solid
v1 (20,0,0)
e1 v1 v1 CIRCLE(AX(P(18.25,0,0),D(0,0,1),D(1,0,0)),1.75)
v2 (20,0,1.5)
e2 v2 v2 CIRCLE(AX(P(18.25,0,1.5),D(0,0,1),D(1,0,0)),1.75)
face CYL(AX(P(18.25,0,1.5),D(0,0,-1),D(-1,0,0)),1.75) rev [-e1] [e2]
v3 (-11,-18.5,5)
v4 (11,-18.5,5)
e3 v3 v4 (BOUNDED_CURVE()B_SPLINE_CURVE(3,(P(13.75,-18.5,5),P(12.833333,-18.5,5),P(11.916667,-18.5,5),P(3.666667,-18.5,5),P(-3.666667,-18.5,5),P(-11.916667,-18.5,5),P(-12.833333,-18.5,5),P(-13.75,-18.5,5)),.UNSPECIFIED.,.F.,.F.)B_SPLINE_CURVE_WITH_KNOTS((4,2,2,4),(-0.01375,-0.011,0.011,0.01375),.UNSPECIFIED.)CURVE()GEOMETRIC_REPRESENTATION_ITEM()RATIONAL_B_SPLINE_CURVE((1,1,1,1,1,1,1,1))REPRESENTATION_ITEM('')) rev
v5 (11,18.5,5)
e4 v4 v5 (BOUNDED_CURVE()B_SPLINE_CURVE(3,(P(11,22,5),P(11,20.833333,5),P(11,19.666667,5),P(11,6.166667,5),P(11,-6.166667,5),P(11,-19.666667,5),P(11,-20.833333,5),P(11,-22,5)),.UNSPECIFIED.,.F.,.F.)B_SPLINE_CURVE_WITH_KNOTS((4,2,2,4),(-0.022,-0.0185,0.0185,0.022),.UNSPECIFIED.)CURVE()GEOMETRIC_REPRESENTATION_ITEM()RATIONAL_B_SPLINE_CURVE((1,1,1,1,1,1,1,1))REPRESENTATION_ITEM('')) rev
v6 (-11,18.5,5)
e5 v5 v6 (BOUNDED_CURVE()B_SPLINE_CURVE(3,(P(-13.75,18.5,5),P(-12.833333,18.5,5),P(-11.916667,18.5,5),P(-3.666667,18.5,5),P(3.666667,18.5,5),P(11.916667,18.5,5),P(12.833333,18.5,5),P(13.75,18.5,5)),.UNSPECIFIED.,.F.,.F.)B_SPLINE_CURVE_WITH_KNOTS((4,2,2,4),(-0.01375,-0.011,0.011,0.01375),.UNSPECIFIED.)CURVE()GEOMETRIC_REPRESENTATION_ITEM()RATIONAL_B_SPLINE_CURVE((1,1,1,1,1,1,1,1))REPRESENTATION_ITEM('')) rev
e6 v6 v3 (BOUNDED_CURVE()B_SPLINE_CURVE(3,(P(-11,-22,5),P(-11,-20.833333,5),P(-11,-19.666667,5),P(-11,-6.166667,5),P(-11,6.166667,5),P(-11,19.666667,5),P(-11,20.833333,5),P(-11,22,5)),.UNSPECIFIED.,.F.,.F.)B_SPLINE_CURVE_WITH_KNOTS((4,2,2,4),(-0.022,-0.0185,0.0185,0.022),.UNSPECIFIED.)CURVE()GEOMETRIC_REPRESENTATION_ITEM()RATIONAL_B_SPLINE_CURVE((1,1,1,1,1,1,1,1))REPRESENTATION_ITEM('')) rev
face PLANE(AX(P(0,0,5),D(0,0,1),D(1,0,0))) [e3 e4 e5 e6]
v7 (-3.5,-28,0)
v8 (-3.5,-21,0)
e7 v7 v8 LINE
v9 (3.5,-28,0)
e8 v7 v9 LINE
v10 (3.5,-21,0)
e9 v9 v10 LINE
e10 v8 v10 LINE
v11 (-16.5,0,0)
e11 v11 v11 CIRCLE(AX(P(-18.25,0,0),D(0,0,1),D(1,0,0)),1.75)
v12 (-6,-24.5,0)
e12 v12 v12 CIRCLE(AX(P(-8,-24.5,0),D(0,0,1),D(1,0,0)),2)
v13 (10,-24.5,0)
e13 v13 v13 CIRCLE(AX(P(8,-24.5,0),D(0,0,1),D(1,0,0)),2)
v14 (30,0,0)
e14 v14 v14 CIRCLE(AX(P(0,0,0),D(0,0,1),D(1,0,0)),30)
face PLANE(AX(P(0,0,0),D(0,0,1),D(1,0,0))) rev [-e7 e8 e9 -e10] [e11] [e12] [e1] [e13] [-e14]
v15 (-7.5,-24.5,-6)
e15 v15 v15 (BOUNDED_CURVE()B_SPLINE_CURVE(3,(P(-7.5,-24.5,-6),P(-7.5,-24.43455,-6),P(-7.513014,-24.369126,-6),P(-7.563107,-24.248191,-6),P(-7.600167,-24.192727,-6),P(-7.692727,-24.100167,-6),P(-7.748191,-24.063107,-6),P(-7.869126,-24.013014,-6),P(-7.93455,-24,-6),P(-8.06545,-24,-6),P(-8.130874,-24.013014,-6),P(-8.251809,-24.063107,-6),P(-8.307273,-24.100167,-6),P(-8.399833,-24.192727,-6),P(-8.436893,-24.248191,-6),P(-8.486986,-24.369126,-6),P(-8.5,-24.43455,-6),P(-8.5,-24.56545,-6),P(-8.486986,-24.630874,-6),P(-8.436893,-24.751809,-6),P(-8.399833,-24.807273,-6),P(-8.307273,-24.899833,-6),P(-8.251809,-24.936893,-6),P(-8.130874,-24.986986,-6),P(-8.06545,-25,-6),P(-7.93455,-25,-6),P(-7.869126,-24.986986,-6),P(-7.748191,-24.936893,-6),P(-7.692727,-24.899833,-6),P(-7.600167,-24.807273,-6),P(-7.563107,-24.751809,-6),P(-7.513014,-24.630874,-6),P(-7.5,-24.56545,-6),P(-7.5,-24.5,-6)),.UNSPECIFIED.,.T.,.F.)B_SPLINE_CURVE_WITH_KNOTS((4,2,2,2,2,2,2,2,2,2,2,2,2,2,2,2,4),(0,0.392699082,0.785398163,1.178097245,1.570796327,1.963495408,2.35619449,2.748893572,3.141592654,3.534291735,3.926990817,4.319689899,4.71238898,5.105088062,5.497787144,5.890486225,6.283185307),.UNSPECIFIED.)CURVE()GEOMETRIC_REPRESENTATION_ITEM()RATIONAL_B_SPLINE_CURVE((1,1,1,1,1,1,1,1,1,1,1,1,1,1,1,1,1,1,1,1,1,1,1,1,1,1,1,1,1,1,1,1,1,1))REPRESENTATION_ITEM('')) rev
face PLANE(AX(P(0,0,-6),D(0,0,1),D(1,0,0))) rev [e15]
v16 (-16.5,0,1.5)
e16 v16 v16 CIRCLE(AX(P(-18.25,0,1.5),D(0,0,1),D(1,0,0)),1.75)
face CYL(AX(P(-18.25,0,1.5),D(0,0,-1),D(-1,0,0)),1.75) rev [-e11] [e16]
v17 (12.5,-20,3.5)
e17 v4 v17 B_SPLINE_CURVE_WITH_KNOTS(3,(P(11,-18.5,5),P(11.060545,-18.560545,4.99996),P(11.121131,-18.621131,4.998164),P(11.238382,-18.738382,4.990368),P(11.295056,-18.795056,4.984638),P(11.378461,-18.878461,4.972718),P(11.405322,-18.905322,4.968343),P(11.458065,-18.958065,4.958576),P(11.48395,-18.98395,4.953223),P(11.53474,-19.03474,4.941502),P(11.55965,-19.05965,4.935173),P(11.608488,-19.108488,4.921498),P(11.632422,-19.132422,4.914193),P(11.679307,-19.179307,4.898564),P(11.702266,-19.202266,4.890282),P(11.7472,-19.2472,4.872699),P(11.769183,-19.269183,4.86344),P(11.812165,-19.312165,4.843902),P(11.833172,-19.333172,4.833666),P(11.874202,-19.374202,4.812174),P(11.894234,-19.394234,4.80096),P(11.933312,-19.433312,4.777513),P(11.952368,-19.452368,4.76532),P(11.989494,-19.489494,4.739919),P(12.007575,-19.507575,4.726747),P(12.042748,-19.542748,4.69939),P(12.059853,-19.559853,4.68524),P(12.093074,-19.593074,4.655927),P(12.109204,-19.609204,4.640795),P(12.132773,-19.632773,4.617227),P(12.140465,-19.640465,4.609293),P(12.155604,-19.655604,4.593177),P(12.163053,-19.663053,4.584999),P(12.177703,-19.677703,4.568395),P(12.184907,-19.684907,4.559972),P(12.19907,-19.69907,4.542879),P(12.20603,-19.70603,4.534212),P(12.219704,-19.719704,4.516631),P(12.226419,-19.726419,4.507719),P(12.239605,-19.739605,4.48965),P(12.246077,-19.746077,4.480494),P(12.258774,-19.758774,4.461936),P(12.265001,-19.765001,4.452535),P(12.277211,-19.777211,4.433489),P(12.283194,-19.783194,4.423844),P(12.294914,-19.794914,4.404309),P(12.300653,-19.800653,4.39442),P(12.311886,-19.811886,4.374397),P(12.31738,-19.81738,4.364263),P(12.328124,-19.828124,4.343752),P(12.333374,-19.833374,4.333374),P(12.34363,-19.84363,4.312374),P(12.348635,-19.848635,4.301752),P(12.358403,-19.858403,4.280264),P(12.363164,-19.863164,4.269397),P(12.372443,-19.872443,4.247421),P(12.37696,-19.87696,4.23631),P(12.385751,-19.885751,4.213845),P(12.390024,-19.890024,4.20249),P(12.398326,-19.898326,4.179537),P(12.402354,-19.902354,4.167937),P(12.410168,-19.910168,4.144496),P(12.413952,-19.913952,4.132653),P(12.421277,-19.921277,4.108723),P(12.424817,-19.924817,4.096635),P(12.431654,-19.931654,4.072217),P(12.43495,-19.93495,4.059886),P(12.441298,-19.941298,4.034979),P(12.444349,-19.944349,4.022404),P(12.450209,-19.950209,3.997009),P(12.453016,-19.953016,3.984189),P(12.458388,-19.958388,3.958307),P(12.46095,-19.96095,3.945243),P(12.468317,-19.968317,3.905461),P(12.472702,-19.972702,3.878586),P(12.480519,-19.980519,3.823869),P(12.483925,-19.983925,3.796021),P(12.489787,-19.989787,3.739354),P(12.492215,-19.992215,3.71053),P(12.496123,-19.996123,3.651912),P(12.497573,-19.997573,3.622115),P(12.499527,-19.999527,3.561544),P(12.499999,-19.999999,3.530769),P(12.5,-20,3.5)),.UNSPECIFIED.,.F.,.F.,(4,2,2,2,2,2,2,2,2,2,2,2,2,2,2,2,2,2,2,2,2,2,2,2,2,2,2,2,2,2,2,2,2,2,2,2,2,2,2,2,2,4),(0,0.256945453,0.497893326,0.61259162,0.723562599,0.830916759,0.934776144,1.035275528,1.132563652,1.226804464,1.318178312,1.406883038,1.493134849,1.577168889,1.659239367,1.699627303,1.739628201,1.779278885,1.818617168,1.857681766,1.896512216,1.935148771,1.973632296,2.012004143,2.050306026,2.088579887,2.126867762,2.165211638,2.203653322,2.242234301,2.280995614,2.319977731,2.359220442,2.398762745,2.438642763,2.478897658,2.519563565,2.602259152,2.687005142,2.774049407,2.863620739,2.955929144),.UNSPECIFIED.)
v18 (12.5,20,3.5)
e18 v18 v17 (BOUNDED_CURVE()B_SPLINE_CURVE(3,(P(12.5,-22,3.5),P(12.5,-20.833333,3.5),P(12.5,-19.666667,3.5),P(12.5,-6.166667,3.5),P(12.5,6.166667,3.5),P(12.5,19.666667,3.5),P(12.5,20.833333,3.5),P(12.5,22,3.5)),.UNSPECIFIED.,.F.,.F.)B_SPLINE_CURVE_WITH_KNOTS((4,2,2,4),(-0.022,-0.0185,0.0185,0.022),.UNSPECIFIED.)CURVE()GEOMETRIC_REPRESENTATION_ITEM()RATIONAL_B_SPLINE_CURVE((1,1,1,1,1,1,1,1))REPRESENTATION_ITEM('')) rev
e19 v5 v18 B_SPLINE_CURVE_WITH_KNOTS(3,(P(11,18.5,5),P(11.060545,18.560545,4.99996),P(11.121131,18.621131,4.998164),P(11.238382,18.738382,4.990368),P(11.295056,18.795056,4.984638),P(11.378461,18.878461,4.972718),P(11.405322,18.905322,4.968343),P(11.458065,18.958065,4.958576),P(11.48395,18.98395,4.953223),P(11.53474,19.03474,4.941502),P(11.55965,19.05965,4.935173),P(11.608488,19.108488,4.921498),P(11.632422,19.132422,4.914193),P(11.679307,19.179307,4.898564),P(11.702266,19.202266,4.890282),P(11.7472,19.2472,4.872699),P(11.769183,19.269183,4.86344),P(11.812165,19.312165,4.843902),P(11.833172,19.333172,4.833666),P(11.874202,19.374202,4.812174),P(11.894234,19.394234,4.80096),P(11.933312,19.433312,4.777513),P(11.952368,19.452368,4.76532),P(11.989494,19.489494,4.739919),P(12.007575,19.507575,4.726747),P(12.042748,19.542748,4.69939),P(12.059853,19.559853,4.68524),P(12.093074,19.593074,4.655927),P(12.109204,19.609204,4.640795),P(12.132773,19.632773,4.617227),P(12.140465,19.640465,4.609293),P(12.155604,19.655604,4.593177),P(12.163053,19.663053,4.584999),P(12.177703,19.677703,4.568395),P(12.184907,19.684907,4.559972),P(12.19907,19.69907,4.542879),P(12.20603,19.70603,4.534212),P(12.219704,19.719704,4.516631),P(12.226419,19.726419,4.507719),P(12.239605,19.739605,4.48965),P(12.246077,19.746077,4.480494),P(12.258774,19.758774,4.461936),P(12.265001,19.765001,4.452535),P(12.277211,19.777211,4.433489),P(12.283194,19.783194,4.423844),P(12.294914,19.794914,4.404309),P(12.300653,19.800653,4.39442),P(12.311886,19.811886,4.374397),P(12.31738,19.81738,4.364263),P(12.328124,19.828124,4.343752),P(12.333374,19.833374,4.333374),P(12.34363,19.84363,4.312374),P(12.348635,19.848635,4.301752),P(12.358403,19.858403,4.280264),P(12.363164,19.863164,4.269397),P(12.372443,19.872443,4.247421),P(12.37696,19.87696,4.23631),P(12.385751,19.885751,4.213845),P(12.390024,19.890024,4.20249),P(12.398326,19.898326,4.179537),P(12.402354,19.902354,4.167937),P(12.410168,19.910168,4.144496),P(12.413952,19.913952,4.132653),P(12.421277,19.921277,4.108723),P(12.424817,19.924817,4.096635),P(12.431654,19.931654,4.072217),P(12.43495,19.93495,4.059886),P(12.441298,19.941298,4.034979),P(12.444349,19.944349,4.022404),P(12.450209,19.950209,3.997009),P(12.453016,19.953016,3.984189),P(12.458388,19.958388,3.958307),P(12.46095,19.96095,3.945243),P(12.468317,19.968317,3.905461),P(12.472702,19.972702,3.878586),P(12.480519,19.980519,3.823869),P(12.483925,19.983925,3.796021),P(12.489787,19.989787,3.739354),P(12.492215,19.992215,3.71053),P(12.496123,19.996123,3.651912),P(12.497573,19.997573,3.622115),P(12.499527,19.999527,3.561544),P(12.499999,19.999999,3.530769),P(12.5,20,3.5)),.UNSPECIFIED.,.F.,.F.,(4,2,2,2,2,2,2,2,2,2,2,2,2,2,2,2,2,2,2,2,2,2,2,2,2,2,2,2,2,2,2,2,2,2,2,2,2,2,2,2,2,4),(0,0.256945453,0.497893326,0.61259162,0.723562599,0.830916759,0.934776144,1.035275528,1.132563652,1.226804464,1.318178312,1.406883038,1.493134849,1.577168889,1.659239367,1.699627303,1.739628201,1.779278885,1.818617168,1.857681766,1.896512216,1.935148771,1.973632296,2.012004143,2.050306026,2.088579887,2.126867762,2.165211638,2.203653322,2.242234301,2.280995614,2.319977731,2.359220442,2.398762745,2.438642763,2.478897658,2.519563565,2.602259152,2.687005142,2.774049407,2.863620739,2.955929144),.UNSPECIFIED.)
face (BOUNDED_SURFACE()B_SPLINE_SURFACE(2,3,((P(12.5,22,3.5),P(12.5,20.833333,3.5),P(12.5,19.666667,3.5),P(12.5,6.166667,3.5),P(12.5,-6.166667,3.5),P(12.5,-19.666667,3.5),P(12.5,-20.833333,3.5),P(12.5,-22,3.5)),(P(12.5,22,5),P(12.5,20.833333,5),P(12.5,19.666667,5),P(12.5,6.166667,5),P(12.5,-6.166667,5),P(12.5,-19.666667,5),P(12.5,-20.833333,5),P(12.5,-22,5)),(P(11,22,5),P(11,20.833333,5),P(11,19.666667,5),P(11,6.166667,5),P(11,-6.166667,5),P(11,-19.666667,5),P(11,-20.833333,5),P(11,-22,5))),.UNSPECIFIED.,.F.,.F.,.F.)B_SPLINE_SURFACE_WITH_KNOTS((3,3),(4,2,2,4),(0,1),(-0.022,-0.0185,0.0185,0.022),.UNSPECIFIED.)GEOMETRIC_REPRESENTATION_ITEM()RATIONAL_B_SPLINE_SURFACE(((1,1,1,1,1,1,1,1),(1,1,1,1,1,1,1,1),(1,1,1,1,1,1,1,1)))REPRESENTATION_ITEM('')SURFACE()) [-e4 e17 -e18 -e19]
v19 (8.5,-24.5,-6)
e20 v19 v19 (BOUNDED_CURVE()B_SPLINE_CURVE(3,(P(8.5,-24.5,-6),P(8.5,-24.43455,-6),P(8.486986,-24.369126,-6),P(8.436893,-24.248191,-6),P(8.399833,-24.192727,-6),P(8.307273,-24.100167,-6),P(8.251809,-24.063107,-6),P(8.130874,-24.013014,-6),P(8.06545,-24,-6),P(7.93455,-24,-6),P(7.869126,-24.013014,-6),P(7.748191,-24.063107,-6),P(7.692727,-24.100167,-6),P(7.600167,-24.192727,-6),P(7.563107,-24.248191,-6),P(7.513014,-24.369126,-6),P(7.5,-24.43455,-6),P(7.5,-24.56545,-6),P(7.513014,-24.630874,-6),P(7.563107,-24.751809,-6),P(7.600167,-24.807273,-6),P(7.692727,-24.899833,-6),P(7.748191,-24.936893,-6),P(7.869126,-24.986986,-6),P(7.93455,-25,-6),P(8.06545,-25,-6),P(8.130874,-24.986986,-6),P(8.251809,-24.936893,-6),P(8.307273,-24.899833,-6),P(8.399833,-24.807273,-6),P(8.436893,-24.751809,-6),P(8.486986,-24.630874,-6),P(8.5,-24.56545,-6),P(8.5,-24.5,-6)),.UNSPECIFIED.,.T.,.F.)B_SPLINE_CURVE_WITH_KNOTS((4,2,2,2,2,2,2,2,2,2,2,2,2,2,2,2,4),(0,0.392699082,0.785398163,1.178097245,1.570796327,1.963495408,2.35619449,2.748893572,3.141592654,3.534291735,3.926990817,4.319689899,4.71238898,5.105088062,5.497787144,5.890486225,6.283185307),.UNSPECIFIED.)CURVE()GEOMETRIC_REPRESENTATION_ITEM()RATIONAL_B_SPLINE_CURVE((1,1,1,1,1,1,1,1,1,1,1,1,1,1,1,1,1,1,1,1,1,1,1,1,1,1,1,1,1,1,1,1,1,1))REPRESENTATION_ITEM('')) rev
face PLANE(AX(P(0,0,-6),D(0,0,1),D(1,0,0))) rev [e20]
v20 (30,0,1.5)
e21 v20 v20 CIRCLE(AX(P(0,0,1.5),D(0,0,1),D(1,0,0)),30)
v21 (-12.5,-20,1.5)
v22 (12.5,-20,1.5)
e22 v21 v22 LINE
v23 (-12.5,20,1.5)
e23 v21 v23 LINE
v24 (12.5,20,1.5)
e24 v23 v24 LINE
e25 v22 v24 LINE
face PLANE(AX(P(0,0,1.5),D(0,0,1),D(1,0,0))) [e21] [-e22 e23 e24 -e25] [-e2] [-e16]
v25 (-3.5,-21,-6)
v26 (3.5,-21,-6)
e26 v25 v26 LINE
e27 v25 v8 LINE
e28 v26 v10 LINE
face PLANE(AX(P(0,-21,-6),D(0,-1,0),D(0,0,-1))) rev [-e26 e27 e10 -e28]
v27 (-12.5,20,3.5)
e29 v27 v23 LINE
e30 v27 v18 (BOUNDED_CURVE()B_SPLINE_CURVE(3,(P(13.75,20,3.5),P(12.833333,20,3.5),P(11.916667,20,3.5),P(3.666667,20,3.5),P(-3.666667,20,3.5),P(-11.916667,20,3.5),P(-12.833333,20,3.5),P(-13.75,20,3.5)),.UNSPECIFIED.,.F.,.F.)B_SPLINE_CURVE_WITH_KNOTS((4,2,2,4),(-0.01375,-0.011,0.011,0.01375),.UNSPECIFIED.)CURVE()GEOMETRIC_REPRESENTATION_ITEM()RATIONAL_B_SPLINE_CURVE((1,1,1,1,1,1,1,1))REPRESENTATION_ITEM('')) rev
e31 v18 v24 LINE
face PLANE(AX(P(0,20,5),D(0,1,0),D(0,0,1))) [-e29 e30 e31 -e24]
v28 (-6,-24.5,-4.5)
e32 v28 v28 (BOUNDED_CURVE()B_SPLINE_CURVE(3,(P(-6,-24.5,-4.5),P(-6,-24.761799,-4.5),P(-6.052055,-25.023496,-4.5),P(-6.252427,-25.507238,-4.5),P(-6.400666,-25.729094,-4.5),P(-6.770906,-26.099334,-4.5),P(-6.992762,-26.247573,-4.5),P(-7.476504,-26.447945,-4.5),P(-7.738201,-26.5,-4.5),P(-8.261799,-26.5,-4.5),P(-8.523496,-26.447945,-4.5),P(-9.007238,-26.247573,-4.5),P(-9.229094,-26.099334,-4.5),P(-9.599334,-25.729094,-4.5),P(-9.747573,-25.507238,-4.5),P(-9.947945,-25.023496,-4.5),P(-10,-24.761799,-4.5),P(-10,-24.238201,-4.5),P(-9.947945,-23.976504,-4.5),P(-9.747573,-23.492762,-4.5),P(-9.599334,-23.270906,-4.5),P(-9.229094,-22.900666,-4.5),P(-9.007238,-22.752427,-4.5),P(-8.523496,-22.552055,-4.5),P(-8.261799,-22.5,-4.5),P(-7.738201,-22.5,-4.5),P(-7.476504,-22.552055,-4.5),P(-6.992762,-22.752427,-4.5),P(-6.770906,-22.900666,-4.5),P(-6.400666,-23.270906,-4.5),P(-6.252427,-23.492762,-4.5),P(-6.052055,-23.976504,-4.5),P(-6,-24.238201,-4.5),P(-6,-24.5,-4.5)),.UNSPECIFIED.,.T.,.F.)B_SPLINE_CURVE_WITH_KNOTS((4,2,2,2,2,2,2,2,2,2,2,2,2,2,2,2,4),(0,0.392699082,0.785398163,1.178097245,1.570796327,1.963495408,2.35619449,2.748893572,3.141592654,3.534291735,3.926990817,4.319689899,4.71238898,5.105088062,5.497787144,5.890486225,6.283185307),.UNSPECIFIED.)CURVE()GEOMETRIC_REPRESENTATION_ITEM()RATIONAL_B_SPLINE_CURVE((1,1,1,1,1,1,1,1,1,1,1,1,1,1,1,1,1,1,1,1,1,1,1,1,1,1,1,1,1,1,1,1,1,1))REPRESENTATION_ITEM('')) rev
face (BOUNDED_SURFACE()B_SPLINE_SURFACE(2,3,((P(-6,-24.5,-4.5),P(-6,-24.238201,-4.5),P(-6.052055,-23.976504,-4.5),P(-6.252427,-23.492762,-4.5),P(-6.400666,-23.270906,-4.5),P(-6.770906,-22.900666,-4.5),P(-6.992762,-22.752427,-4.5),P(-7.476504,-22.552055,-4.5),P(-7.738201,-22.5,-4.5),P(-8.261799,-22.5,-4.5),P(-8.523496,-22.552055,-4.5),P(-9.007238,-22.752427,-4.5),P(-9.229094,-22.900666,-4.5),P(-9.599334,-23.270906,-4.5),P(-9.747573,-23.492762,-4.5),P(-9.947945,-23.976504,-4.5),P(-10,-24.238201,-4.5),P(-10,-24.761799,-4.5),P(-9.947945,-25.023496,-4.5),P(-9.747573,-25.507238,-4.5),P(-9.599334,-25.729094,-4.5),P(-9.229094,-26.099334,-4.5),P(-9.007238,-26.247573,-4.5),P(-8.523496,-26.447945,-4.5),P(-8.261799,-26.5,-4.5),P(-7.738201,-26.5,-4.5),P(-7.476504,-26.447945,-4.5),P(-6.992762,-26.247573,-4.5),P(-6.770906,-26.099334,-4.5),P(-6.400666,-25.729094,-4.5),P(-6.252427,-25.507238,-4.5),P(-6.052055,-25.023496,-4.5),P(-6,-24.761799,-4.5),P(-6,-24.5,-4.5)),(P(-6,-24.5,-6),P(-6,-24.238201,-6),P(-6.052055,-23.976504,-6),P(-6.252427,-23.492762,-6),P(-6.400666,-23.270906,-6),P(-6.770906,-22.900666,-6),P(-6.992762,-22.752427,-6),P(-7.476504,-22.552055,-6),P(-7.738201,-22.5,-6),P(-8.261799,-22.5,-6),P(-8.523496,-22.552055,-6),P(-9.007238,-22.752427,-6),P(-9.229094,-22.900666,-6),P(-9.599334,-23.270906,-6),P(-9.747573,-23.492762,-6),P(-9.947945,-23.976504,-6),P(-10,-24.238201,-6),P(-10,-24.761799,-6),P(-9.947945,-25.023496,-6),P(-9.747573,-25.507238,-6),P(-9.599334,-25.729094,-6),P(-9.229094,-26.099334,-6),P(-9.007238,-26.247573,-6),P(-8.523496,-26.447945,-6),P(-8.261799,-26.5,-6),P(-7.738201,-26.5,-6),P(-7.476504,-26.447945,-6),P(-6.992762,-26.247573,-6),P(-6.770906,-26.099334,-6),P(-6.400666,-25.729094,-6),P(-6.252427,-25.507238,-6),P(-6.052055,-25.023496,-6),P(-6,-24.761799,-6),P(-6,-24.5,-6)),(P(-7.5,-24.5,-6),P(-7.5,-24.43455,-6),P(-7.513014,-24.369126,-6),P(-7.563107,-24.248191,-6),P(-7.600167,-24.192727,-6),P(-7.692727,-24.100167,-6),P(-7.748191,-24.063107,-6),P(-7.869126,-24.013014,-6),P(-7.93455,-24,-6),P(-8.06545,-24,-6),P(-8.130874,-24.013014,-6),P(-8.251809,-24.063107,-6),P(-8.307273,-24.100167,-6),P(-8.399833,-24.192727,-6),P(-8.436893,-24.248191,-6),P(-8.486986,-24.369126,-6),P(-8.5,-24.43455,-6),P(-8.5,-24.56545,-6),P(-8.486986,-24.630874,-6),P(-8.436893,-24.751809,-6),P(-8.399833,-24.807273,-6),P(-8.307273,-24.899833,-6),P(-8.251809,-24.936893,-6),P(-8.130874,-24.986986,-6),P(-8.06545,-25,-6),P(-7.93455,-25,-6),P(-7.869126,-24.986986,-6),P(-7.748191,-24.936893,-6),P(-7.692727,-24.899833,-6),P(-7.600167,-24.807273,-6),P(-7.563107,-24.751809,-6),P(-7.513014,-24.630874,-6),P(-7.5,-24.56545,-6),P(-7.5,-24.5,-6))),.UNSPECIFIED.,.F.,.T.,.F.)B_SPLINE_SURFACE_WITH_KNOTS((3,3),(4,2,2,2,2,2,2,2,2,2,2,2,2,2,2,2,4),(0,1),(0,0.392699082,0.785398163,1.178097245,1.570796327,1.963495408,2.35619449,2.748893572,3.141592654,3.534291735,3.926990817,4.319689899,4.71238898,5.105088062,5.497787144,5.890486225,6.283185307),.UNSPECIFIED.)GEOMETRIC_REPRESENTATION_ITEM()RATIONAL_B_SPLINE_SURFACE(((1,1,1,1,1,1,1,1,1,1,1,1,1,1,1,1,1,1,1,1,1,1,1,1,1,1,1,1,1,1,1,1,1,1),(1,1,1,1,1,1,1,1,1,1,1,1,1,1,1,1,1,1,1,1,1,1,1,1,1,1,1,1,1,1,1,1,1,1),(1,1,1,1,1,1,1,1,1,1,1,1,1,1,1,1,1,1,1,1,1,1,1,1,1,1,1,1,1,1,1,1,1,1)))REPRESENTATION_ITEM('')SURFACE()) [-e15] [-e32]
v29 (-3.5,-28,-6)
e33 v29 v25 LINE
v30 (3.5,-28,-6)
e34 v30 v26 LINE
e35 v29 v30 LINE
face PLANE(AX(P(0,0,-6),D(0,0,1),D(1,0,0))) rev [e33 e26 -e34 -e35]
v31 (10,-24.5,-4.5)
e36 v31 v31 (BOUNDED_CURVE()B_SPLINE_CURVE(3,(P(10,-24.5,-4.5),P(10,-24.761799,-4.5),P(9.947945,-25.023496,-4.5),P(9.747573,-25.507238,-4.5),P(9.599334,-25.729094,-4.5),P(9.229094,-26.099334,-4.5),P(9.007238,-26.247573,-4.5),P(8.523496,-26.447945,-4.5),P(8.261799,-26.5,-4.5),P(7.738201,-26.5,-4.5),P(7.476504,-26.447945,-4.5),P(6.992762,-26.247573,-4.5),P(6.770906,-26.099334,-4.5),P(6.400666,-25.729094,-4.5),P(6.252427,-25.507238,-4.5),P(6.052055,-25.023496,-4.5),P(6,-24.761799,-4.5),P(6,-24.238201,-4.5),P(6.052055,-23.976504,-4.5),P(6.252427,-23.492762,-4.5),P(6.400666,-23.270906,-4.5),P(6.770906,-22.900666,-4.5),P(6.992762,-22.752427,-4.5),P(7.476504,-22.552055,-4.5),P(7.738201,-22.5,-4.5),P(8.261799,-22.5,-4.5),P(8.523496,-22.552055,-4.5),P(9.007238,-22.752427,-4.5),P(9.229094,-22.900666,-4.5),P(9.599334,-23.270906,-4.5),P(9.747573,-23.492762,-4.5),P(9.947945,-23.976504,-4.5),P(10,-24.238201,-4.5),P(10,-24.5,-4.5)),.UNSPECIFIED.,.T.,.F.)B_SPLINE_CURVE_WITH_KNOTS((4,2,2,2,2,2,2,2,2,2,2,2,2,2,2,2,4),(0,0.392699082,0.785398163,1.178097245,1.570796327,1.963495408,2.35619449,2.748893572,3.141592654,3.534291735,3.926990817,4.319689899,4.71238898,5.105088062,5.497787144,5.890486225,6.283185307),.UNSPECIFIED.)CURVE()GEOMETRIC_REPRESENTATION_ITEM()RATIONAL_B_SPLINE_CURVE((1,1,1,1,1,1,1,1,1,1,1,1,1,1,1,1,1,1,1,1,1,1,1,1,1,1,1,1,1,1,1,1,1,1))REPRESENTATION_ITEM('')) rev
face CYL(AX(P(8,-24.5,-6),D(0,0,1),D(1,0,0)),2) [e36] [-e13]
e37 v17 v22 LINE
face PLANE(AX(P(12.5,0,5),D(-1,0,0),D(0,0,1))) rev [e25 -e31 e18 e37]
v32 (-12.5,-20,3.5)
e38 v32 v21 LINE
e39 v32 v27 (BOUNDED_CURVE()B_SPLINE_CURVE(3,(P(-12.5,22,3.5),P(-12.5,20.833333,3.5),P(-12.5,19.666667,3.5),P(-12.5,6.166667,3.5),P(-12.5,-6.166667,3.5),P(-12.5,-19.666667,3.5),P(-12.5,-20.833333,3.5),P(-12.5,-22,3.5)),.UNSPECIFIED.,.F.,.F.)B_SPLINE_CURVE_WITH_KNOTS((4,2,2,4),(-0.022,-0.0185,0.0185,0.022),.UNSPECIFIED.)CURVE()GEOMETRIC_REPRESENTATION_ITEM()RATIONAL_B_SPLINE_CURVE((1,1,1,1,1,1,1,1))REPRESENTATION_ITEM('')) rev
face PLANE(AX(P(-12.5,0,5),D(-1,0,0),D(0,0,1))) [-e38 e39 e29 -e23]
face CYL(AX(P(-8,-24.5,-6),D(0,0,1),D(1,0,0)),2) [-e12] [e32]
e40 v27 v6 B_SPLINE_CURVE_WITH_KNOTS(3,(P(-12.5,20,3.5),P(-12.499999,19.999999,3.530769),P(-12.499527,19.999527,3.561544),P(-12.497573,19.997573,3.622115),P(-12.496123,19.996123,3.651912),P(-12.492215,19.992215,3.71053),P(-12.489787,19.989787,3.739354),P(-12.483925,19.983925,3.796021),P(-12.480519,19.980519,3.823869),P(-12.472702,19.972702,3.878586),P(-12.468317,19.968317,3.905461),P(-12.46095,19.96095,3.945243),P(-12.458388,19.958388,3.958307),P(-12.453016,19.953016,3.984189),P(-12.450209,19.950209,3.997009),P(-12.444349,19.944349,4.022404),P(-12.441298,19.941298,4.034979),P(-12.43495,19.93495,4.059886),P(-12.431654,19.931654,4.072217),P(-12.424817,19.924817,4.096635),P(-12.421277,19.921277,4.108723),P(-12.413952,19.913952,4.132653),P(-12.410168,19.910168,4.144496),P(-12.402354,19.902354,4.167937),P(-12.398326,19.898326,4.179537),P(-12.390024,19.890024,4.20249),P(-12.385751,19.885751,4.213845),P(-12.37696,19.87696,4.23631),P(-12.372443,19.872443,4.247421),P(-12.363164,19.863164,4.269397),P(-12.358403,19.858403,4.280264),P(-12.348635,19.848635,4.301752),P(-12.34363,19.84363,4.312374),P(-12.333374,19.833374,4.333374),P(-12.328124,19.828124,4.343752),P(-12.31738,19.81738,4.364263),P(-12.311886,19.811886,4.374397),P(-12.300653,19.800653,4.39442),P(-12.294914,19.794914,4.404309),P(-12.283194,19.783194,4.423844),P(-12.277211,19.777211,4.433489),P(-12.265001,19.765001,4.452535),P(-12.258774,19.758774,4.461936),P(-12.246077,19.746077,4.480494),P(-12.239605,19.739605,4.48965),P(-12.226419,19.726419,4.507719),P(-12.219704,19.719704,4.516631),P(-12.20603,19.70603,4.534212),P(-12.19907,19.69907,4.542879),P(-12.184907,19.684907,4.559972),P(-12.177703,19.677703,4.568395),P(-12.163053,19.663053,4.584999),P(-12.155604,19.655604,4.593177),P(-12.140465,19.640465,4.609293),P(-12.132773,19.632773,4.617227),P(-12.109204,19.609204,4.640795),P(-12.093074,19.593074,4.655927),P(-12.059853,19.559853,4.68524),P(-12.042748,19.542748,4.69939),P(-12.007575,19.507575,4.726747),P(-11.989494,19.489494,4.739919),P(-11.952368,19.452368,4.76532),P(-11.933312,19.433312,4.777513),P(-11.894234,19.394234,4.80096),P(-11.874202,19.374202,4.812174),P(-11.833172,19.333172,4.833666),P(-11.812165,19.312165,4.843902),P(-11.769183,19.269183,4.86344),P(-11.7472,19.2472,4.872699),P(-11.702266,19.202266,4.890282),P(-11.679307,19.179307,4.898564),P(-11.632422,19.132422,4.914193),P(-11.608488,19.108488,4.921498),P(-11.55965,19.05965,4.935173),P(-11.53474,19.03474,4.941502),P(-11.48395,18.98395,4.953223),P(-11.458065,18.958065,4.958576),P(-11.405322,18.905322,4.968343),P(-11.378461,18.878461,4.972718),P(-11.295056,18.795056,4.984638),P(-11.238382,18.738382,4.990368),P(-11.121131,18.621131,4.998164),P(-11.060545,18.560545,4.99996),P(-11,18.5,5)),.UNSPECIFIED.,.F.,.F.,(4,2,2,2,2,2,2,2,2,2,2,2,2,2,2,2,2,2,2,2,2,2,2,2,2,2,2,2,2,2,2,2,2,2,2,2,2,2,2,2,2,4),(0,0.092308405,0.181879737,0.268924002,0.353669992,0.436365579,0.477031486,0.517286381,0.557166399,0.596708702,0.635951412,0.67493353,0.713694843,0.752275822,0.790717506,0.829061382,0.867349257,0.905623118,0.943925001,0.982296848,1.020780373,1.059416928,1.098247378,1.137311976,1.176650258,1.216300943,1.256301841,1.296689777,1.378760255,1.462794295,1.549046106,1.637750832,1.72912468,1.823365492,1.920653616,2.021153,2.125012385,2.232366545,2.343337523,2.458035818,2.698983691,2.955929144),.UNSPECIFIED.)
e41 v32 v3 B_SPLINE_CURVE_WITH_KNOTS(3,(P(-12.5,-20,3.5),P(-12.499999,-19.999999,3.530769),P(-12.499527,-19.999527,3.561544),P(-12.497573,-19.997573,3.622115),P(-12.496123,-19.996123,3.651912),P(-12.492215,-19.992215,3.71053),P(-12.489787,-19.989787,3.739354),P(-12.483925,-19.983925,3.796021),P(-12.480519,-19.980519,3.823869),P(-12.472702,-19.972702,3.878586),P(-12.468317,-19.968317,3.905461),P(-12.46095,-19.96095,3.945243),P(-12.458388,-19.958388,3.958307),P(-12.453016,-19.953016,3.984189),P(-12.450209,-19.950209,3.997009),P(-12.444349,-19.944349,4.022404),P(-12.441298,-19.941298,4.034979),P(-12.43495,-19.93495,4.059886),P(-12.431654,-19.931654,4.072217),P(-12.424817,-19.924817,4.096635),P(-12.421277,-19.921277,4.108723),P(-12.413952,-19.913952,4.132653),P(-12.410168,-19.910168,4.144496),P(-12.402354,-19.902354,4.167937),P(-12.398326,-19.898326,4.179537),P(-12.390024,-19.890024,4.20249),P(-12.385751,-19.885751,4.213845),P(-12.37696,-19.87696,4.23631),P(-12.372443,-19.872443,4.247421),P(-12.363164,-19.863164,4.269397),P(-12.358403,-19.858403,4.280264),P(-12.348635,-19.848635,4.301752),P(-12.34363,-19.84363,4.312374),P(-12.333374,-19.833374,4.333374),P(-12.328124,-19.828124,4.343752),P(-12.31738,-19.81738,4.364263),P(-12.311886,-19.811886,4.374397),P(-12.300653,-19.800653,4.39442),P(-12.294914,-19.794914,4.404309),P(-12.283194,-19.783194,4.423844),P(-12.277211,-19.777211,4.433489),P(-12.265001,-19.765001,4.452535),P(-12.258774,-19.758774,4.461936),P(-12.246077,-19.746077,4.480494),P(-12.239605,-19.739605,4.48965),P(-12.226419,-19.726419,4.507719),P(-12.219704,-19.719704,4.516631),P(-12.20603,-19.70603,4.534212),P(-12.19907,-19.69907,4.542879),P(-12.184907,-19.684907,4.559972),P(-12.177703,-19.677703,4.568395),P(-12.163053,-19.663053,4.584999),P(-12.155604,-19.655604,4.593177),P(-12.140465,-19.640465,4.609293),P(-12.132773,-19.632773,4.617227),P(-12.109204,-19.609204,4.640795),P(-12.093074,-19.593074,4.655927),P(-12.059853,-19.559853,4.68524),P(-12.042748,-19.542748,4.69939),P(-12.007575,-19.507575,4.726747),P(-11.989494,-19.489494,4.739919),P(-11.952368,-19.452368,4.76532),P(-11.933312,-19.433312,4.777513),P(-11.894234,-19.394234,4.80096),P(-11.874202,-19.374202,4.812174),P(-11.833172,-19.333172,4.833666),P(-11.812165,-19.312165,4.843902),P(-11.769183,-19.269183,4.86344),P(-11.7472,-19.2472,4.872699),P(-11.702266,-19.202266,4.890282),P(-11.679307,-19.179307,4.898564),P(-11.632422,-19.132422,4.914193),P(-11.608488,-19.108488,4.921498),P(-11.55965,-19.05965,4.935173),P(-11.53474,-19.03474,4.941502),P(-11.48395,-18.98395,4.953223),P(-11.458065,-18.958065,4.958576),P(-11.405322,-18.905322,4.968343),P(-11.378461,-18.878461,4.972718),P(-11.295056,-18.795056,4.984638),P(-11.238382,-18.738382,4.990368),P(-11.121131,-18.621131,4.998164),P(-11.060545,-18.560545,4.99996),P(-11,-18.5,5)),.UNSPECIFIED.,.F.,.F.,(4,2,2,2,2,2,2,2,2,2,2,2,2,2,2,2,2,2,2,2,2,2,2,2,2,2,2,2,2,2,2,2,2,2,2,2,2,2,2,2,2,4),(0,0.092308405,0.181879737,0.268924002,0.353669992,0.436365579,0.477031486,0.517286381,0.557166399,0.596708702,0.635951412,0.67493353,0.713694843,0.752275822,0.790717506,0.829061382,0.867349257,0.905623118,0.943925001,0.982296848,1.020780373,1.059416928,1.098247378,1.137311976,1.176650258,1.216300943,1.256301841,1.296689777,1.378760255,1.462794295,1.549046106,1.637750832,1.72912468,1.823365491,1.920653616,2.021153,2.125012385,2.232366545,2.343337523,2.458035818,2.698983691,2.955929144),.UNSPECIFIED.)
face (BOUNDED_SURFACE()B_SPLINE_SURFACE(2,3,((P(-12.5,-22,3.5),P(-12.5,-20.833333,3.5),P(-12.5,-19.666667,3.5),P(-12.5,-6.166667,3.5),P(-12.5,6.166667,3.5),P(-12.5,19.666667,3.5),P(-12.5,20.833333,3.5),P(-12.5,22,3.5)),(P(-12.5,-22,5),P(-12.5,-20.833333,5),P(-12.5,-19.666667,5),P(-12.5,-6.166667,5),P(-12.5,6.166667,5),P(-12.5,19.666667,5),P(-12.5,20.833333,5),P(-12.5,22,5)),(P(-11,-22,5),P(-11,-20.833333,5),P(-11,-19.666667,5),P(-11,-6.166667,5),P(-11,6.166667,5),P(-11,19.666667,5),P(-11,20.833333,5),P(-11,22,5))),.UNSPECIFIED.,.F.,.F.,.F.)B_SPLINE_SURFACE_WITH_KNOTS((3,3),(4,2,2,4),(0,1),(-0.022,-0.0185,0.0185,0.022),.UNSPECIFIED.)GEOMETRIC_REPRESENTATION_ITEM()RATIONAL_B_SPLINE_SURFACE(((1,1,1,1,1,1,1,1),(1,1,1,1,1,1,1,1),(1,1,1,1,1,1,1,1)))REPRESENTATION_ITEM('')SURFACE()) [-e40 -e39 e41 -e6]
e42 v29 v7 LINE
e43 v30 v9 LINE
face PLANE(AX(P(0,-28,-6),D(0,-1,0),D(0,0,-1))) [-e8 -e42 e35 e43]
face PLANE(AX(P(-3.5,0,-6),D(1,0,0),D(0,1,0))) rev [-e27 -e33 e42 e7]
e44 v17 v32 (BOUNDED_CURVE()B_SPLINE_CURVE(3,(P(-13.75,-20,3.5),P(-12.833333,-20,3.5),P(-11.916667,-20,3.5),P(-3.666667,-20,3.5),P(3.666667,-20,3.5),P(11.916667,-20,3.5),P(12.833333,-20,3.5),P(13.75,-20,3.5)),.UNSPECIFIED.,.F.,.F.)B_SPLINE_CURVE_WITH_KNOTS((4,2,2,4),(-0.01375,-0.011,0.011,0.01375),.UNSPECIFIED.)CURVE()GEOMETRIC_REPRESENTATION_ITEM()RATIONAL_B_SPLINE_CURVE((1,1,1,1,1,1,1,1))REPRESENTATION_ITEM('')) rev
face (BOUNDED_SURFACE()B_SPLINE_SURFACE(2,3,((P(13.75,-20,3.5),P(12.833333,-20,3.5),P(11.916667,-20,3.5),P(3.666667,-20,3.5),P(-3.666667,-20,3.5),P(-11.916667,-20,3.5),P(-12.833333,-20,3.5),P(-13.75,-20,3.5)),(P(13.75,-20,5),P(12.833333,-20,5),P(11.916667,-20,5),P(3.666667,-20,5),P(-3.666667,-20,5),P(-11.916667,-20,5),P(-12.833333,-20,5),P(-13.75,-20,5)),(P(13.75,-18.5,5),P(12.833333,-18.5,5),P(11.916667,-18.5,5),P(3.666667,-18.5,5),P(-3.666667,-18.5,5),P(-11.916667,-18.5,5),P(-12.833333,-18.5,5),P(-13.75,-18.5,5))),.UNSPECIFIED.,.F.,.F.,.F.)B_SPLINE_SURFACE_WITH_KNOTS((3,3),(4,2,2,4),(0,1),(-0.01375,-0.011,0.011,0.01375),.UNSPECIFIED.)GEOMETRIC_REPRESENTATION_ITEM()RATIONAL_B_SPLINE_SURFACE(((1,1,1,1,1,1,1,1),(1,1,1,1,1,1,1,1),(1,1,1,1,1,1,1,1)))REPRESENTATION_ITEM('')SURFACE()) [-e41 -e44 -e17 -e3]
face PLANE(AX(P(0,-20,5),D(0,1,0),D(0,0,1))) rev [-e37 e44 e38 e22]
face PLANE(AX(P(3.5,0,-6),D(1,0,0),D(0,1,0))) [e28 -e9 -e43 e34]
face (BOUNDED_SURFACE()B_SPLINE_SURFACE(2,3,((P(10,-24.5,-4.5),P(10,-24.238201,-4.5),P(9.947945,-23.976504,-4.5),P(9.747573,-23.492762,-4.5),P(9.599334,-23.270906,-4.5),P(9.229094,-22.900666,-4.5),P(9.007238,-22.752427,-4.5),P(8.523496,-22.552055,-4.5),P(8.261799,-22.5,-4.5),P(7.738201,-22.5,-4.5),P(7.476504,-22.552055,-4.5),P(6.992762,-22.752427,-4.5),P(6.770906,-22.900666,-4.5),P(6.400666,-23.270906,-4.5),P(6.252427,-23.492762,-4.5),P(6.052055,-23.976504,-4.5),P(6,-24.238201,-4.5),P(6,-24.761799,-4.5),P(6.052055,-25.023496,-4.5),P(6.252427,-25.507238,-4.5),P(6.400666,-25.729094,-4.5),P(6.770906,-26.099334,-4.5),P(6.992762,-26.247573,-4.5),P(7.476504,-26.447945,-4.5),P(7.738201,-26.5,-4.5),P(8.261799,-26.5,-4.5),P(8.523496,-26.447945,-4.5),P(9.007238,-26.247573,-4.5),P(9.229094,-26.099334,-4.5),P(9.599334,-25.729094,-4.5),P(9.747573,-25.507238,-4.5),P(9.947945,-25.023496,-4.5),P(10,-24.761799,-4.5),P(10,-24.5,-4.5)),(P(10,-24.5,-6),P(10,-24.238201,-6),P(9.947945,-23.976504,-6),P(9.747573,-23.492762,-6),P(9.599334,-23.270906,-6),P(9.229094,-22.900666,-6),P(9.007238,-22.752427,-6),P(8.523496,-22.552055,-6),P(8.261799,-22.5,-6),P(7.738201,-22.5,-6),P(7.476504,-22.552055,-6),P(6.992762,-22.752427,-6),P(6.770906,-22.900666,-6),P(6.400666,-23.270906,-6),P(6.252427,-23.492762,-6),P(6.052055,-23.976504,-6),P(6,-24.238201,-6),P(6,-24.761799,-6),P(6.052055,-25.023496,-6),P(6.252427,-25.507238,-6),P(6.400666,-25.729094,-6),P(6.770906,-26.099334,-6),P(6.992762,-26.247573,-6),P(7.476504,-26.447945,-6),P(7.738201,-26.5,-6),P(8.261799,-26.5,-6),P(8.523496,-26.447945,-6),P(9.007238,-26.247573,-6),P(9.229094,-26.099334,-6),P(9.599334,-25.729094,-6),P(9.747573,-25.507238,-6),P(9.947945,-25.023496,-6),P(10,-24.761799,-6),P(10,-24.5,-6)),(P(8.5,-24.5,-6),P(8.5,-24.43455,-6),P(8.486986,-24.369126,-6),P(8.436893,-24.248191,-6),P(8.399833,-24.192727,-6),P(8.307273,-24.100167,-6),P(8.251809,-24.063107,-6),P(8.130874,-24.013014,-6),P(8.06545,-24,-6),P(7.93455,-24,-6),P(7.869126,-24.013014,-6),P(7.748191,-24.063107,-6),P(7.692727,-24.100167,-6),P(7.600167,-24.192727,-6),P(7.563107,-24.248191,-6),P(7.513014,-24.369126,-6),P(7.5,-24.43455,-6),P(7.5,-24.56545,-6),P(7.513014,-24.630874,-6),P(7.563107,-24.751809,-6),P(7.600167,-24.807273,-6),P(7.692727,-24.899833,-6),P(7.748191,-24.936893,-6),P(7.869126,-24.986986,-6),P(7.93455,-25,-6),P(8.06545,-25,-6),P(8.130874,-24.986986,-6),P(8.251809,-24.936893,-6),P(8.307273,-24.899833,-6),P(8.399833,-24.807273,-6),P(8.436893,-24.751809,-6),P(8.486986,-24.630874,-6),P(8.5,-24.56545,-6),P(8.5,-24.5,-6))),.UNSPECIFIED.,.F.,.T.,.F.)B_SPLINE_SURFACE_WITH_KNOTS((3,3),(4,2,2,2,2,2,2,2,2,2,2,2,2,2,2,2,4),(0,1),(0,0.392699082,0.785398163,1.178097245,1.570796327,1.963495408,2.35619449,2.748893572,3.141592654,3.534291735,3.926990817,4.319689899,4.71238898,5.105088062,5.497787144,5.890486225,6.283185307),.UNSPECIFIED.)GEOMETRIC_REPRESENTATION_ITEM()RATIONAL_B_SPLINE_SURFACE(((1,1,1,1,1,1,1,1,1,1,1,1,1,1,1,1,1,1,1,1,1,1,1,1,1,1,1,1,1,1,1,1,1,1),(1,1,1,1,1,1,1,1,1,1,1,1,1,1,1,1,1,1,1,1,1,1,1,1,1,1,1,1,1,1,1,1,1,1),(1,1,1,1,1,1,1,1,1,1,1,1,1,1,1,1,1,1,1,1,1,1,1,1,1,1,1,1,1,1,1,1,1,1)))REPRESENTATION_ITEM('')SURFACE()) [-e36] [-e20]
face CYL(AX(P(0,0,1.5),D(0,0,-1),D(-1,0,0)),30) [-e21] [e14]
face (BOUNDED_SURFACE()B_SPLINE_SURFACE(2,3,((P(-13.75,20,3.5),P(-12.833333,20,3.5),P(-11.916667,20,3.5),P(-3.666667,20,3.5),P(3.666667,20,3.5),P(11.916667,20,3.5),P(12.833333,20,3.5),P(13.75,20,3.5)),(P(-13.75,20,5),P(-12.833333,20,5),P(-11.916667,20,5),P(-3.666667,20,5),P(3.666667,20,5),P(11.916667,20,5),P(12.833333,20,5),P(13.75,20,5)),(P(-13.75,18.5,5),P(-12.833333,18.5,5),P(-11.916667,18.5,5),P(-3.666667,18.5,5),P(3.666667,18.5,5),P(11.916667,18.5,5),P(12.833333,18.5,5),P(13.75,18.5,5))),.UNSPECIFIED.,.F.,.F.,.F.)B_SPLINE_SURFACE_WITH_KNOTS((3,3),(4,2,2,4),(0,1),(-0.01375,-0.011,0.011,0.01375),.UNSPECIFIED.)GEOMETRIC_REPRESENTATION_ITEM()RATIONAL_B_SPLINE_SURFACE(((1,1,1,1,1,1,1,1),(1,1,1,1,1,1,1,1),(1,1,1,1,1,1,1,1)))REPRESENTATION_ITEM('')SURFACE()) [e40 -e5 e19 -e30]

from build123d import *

# Parameters (mm, degrees)
SKETCH_1_R      = 30
SKETCH_1_R_2    = 1.75
SKETCH_1_W      = 25
SKETCH_1_H      = 40
EXTRUDE_6_DEPTH = 1.5
EXTRUDE_7_DEPTH = 5
SKETCH_1_10_R   = 2
SKETCH_1_10_W   = 7
SKETCH_1_10_H   = 7
EXTRUDE_8_DEPTH = 6
FILLET_3_SIZE   = 1.5
FILLET_4_SIZE   = 1.5
EXTRUDE_9_DEPTH = 5
FILLET_5_SIZE   = 1.5


with BuildPart() as part:
    # 草图1 → 凸台-拉伸6 (new body)
    with BuildSketch(Plane.XY):
        Circle(SKETCH_1_R)
        with Locations((18.25, 0)):
            Circle(SKETCH_1_R_2, mode=Mode.SUBTRACT)
        with Locations((-18.25, 0)):
            Circle(SKETCH_1_R_2, mode=Mode.SUBTRACT)
        Rectangle(SKETCH_1_W, SKETCH_1_H, mode=Mode.SUBTRACT)
    extrude(amount=EXTRUDE_6_DEPTH)

    # 草图1<9> → 凸台-拉伸7 (add)
    with BuildSketch(Plane.XY):
        Polygon((-12.5, 20), (-12.5, 0), (0, 0), (12.5, 0), (12.5, 20), align=None)
    extrude(amount=EXTRUDE_7_DEPTH)

    # 草图1<10> → 凸台-拉伸8 (add)
    with BuildSketch(Plane.XY):
        with Locations((8, -24.5)):
            Circle(SKETCH_1_10_R)
        with Locations((0, -24.5)):
            Rectangle(SKETCH_1_10_W, SKETCH_1_10_H)
        with Locations((-8, -24.5)):
            Circle(SKETCH_1_10_R)
    extrude(amount=-EXTRUDE_8_DEPTH)

    # 圆角3
    # a fillet whose section is not a circle: 1.5 mm, written as the material it takes off along each edge
    with BuildSketch(Plane(origin=(8, -24.5, -6), x_dir=(1, 0, 0), z_dir=(0, -1, 0))) as fillet_3_piece_1:
        with BuildLine():
            Bezier((2, FILLET_3_SIZE), (2, 0), (2 - FILLET_3_SIZE, 0), weights=[1, 1, 1])
            Line((2 - FILLET_3_SIZE, 0), (2, 0))
            Line((2, 0), (2, FILLET_3_SIZE))
        make_face()
    revolve(axis=Axis((8, -24.5, -6), (0, 0, 1)), mode=Mode.SUBTRACT)

    # 圆角4
    # a fillet whose section is not a circle: 1.5 mm, written as the material it takes off along each edge
    with BuildSketch(Plane(origin=(-8, -24.5, -6), x_dir=(1, 0, 0), z_dir=(0, -1, 0))) as fillet_4_piece_1:
        with BuildLine():
            Bezier((2, FILLET_4_SIZE), (2, 0), (2 - FILLET_4_SIZE, 0), weights=[1, 1, 1])
            Line((2 - FILLET_4_SIZE, 0), (2, 0))
            Line((2, 0), (2, FILLET_4_SIZE))
        make_face()
    revolve(axis=Axis((-8, -24.5, -6), (0, 0, 1)), mode=Mode.SUBTRACT)

    # 草图1<11> → 凸台-拉伸9 (add)
    with BuildSketch(Plane.XY):
        Polygon((-12.5, 0), (-12.5, -20), (12.5, -20), (12.5, 0), (0, 0), align=None)
    extrude(amount=EXTRUDE_9_DEPTH)

    # 圆角5
    # a fillet whose section is not a circle: 1.5 mm, written as the material it takes off along each edge
    with BuildSketch(Plane(origin=(16.25, 20, 5), x_dir=(0, -1, 0), z_dir=(-1, 0, 0))) as fillet_5_piece_1:
        with BuildLine():
            Bezier((FILLET_5_SIZE, 0), (0, 0), (0, -FILLET_5_SIZE), weights=[1, 1, 1])
            Line((0, -FILLET_5_SIZE), (0, 0))
            Line((0, 0), (FILLET_5_SIZE, 0))
        make_face()
    extrude(amount=32.5, mode=Mode.SUBTRACT)
    with BuildSketch(Plane(origin=(12.5, 23.75, 5), x_dir=(-1, 0, 0), z_dir=(0, -1, 0)), Plane(origin=(-12.5, -23.75, 5), x_dir=(1, 0, 0), z_dir=(0, 1, 0))) as fillet_5_piece_2:
        with BuildLine():
            Bezier((FILLET_5_SIZE, 0), (0, 0), (0, FILLET_5_SIZE), weights=[1, 1, 1])
            Line((0, FILLET_5_SIZE), (0, 0))
            Line((0, 0), (FILLET_5_SIZE, 0))
        make_face()
    extrude(amount=47.5, mode=Mode.SUBTRACT)
    with BuildSketch(Plane(origin=(-16.25, -20, 5), x_dir=(0, 0, -1), z_dir=(1, 0, 0))) as fillet_5_piece_3:
        with BuildLine():
            Bezier((FILLET_5_SIZE, 0), (0, 0), (0, FILLET_5_SIZE), weights=[1, 1, 1])
            Line((0, FILLET_5_SIZE), (0, 0))
            Line((0, 0), (FILLET_5_SIZE, 0))
        make_face()
    extrude(amount=32.5, mode=Mode.SUBTRACT)


solid = part.part
